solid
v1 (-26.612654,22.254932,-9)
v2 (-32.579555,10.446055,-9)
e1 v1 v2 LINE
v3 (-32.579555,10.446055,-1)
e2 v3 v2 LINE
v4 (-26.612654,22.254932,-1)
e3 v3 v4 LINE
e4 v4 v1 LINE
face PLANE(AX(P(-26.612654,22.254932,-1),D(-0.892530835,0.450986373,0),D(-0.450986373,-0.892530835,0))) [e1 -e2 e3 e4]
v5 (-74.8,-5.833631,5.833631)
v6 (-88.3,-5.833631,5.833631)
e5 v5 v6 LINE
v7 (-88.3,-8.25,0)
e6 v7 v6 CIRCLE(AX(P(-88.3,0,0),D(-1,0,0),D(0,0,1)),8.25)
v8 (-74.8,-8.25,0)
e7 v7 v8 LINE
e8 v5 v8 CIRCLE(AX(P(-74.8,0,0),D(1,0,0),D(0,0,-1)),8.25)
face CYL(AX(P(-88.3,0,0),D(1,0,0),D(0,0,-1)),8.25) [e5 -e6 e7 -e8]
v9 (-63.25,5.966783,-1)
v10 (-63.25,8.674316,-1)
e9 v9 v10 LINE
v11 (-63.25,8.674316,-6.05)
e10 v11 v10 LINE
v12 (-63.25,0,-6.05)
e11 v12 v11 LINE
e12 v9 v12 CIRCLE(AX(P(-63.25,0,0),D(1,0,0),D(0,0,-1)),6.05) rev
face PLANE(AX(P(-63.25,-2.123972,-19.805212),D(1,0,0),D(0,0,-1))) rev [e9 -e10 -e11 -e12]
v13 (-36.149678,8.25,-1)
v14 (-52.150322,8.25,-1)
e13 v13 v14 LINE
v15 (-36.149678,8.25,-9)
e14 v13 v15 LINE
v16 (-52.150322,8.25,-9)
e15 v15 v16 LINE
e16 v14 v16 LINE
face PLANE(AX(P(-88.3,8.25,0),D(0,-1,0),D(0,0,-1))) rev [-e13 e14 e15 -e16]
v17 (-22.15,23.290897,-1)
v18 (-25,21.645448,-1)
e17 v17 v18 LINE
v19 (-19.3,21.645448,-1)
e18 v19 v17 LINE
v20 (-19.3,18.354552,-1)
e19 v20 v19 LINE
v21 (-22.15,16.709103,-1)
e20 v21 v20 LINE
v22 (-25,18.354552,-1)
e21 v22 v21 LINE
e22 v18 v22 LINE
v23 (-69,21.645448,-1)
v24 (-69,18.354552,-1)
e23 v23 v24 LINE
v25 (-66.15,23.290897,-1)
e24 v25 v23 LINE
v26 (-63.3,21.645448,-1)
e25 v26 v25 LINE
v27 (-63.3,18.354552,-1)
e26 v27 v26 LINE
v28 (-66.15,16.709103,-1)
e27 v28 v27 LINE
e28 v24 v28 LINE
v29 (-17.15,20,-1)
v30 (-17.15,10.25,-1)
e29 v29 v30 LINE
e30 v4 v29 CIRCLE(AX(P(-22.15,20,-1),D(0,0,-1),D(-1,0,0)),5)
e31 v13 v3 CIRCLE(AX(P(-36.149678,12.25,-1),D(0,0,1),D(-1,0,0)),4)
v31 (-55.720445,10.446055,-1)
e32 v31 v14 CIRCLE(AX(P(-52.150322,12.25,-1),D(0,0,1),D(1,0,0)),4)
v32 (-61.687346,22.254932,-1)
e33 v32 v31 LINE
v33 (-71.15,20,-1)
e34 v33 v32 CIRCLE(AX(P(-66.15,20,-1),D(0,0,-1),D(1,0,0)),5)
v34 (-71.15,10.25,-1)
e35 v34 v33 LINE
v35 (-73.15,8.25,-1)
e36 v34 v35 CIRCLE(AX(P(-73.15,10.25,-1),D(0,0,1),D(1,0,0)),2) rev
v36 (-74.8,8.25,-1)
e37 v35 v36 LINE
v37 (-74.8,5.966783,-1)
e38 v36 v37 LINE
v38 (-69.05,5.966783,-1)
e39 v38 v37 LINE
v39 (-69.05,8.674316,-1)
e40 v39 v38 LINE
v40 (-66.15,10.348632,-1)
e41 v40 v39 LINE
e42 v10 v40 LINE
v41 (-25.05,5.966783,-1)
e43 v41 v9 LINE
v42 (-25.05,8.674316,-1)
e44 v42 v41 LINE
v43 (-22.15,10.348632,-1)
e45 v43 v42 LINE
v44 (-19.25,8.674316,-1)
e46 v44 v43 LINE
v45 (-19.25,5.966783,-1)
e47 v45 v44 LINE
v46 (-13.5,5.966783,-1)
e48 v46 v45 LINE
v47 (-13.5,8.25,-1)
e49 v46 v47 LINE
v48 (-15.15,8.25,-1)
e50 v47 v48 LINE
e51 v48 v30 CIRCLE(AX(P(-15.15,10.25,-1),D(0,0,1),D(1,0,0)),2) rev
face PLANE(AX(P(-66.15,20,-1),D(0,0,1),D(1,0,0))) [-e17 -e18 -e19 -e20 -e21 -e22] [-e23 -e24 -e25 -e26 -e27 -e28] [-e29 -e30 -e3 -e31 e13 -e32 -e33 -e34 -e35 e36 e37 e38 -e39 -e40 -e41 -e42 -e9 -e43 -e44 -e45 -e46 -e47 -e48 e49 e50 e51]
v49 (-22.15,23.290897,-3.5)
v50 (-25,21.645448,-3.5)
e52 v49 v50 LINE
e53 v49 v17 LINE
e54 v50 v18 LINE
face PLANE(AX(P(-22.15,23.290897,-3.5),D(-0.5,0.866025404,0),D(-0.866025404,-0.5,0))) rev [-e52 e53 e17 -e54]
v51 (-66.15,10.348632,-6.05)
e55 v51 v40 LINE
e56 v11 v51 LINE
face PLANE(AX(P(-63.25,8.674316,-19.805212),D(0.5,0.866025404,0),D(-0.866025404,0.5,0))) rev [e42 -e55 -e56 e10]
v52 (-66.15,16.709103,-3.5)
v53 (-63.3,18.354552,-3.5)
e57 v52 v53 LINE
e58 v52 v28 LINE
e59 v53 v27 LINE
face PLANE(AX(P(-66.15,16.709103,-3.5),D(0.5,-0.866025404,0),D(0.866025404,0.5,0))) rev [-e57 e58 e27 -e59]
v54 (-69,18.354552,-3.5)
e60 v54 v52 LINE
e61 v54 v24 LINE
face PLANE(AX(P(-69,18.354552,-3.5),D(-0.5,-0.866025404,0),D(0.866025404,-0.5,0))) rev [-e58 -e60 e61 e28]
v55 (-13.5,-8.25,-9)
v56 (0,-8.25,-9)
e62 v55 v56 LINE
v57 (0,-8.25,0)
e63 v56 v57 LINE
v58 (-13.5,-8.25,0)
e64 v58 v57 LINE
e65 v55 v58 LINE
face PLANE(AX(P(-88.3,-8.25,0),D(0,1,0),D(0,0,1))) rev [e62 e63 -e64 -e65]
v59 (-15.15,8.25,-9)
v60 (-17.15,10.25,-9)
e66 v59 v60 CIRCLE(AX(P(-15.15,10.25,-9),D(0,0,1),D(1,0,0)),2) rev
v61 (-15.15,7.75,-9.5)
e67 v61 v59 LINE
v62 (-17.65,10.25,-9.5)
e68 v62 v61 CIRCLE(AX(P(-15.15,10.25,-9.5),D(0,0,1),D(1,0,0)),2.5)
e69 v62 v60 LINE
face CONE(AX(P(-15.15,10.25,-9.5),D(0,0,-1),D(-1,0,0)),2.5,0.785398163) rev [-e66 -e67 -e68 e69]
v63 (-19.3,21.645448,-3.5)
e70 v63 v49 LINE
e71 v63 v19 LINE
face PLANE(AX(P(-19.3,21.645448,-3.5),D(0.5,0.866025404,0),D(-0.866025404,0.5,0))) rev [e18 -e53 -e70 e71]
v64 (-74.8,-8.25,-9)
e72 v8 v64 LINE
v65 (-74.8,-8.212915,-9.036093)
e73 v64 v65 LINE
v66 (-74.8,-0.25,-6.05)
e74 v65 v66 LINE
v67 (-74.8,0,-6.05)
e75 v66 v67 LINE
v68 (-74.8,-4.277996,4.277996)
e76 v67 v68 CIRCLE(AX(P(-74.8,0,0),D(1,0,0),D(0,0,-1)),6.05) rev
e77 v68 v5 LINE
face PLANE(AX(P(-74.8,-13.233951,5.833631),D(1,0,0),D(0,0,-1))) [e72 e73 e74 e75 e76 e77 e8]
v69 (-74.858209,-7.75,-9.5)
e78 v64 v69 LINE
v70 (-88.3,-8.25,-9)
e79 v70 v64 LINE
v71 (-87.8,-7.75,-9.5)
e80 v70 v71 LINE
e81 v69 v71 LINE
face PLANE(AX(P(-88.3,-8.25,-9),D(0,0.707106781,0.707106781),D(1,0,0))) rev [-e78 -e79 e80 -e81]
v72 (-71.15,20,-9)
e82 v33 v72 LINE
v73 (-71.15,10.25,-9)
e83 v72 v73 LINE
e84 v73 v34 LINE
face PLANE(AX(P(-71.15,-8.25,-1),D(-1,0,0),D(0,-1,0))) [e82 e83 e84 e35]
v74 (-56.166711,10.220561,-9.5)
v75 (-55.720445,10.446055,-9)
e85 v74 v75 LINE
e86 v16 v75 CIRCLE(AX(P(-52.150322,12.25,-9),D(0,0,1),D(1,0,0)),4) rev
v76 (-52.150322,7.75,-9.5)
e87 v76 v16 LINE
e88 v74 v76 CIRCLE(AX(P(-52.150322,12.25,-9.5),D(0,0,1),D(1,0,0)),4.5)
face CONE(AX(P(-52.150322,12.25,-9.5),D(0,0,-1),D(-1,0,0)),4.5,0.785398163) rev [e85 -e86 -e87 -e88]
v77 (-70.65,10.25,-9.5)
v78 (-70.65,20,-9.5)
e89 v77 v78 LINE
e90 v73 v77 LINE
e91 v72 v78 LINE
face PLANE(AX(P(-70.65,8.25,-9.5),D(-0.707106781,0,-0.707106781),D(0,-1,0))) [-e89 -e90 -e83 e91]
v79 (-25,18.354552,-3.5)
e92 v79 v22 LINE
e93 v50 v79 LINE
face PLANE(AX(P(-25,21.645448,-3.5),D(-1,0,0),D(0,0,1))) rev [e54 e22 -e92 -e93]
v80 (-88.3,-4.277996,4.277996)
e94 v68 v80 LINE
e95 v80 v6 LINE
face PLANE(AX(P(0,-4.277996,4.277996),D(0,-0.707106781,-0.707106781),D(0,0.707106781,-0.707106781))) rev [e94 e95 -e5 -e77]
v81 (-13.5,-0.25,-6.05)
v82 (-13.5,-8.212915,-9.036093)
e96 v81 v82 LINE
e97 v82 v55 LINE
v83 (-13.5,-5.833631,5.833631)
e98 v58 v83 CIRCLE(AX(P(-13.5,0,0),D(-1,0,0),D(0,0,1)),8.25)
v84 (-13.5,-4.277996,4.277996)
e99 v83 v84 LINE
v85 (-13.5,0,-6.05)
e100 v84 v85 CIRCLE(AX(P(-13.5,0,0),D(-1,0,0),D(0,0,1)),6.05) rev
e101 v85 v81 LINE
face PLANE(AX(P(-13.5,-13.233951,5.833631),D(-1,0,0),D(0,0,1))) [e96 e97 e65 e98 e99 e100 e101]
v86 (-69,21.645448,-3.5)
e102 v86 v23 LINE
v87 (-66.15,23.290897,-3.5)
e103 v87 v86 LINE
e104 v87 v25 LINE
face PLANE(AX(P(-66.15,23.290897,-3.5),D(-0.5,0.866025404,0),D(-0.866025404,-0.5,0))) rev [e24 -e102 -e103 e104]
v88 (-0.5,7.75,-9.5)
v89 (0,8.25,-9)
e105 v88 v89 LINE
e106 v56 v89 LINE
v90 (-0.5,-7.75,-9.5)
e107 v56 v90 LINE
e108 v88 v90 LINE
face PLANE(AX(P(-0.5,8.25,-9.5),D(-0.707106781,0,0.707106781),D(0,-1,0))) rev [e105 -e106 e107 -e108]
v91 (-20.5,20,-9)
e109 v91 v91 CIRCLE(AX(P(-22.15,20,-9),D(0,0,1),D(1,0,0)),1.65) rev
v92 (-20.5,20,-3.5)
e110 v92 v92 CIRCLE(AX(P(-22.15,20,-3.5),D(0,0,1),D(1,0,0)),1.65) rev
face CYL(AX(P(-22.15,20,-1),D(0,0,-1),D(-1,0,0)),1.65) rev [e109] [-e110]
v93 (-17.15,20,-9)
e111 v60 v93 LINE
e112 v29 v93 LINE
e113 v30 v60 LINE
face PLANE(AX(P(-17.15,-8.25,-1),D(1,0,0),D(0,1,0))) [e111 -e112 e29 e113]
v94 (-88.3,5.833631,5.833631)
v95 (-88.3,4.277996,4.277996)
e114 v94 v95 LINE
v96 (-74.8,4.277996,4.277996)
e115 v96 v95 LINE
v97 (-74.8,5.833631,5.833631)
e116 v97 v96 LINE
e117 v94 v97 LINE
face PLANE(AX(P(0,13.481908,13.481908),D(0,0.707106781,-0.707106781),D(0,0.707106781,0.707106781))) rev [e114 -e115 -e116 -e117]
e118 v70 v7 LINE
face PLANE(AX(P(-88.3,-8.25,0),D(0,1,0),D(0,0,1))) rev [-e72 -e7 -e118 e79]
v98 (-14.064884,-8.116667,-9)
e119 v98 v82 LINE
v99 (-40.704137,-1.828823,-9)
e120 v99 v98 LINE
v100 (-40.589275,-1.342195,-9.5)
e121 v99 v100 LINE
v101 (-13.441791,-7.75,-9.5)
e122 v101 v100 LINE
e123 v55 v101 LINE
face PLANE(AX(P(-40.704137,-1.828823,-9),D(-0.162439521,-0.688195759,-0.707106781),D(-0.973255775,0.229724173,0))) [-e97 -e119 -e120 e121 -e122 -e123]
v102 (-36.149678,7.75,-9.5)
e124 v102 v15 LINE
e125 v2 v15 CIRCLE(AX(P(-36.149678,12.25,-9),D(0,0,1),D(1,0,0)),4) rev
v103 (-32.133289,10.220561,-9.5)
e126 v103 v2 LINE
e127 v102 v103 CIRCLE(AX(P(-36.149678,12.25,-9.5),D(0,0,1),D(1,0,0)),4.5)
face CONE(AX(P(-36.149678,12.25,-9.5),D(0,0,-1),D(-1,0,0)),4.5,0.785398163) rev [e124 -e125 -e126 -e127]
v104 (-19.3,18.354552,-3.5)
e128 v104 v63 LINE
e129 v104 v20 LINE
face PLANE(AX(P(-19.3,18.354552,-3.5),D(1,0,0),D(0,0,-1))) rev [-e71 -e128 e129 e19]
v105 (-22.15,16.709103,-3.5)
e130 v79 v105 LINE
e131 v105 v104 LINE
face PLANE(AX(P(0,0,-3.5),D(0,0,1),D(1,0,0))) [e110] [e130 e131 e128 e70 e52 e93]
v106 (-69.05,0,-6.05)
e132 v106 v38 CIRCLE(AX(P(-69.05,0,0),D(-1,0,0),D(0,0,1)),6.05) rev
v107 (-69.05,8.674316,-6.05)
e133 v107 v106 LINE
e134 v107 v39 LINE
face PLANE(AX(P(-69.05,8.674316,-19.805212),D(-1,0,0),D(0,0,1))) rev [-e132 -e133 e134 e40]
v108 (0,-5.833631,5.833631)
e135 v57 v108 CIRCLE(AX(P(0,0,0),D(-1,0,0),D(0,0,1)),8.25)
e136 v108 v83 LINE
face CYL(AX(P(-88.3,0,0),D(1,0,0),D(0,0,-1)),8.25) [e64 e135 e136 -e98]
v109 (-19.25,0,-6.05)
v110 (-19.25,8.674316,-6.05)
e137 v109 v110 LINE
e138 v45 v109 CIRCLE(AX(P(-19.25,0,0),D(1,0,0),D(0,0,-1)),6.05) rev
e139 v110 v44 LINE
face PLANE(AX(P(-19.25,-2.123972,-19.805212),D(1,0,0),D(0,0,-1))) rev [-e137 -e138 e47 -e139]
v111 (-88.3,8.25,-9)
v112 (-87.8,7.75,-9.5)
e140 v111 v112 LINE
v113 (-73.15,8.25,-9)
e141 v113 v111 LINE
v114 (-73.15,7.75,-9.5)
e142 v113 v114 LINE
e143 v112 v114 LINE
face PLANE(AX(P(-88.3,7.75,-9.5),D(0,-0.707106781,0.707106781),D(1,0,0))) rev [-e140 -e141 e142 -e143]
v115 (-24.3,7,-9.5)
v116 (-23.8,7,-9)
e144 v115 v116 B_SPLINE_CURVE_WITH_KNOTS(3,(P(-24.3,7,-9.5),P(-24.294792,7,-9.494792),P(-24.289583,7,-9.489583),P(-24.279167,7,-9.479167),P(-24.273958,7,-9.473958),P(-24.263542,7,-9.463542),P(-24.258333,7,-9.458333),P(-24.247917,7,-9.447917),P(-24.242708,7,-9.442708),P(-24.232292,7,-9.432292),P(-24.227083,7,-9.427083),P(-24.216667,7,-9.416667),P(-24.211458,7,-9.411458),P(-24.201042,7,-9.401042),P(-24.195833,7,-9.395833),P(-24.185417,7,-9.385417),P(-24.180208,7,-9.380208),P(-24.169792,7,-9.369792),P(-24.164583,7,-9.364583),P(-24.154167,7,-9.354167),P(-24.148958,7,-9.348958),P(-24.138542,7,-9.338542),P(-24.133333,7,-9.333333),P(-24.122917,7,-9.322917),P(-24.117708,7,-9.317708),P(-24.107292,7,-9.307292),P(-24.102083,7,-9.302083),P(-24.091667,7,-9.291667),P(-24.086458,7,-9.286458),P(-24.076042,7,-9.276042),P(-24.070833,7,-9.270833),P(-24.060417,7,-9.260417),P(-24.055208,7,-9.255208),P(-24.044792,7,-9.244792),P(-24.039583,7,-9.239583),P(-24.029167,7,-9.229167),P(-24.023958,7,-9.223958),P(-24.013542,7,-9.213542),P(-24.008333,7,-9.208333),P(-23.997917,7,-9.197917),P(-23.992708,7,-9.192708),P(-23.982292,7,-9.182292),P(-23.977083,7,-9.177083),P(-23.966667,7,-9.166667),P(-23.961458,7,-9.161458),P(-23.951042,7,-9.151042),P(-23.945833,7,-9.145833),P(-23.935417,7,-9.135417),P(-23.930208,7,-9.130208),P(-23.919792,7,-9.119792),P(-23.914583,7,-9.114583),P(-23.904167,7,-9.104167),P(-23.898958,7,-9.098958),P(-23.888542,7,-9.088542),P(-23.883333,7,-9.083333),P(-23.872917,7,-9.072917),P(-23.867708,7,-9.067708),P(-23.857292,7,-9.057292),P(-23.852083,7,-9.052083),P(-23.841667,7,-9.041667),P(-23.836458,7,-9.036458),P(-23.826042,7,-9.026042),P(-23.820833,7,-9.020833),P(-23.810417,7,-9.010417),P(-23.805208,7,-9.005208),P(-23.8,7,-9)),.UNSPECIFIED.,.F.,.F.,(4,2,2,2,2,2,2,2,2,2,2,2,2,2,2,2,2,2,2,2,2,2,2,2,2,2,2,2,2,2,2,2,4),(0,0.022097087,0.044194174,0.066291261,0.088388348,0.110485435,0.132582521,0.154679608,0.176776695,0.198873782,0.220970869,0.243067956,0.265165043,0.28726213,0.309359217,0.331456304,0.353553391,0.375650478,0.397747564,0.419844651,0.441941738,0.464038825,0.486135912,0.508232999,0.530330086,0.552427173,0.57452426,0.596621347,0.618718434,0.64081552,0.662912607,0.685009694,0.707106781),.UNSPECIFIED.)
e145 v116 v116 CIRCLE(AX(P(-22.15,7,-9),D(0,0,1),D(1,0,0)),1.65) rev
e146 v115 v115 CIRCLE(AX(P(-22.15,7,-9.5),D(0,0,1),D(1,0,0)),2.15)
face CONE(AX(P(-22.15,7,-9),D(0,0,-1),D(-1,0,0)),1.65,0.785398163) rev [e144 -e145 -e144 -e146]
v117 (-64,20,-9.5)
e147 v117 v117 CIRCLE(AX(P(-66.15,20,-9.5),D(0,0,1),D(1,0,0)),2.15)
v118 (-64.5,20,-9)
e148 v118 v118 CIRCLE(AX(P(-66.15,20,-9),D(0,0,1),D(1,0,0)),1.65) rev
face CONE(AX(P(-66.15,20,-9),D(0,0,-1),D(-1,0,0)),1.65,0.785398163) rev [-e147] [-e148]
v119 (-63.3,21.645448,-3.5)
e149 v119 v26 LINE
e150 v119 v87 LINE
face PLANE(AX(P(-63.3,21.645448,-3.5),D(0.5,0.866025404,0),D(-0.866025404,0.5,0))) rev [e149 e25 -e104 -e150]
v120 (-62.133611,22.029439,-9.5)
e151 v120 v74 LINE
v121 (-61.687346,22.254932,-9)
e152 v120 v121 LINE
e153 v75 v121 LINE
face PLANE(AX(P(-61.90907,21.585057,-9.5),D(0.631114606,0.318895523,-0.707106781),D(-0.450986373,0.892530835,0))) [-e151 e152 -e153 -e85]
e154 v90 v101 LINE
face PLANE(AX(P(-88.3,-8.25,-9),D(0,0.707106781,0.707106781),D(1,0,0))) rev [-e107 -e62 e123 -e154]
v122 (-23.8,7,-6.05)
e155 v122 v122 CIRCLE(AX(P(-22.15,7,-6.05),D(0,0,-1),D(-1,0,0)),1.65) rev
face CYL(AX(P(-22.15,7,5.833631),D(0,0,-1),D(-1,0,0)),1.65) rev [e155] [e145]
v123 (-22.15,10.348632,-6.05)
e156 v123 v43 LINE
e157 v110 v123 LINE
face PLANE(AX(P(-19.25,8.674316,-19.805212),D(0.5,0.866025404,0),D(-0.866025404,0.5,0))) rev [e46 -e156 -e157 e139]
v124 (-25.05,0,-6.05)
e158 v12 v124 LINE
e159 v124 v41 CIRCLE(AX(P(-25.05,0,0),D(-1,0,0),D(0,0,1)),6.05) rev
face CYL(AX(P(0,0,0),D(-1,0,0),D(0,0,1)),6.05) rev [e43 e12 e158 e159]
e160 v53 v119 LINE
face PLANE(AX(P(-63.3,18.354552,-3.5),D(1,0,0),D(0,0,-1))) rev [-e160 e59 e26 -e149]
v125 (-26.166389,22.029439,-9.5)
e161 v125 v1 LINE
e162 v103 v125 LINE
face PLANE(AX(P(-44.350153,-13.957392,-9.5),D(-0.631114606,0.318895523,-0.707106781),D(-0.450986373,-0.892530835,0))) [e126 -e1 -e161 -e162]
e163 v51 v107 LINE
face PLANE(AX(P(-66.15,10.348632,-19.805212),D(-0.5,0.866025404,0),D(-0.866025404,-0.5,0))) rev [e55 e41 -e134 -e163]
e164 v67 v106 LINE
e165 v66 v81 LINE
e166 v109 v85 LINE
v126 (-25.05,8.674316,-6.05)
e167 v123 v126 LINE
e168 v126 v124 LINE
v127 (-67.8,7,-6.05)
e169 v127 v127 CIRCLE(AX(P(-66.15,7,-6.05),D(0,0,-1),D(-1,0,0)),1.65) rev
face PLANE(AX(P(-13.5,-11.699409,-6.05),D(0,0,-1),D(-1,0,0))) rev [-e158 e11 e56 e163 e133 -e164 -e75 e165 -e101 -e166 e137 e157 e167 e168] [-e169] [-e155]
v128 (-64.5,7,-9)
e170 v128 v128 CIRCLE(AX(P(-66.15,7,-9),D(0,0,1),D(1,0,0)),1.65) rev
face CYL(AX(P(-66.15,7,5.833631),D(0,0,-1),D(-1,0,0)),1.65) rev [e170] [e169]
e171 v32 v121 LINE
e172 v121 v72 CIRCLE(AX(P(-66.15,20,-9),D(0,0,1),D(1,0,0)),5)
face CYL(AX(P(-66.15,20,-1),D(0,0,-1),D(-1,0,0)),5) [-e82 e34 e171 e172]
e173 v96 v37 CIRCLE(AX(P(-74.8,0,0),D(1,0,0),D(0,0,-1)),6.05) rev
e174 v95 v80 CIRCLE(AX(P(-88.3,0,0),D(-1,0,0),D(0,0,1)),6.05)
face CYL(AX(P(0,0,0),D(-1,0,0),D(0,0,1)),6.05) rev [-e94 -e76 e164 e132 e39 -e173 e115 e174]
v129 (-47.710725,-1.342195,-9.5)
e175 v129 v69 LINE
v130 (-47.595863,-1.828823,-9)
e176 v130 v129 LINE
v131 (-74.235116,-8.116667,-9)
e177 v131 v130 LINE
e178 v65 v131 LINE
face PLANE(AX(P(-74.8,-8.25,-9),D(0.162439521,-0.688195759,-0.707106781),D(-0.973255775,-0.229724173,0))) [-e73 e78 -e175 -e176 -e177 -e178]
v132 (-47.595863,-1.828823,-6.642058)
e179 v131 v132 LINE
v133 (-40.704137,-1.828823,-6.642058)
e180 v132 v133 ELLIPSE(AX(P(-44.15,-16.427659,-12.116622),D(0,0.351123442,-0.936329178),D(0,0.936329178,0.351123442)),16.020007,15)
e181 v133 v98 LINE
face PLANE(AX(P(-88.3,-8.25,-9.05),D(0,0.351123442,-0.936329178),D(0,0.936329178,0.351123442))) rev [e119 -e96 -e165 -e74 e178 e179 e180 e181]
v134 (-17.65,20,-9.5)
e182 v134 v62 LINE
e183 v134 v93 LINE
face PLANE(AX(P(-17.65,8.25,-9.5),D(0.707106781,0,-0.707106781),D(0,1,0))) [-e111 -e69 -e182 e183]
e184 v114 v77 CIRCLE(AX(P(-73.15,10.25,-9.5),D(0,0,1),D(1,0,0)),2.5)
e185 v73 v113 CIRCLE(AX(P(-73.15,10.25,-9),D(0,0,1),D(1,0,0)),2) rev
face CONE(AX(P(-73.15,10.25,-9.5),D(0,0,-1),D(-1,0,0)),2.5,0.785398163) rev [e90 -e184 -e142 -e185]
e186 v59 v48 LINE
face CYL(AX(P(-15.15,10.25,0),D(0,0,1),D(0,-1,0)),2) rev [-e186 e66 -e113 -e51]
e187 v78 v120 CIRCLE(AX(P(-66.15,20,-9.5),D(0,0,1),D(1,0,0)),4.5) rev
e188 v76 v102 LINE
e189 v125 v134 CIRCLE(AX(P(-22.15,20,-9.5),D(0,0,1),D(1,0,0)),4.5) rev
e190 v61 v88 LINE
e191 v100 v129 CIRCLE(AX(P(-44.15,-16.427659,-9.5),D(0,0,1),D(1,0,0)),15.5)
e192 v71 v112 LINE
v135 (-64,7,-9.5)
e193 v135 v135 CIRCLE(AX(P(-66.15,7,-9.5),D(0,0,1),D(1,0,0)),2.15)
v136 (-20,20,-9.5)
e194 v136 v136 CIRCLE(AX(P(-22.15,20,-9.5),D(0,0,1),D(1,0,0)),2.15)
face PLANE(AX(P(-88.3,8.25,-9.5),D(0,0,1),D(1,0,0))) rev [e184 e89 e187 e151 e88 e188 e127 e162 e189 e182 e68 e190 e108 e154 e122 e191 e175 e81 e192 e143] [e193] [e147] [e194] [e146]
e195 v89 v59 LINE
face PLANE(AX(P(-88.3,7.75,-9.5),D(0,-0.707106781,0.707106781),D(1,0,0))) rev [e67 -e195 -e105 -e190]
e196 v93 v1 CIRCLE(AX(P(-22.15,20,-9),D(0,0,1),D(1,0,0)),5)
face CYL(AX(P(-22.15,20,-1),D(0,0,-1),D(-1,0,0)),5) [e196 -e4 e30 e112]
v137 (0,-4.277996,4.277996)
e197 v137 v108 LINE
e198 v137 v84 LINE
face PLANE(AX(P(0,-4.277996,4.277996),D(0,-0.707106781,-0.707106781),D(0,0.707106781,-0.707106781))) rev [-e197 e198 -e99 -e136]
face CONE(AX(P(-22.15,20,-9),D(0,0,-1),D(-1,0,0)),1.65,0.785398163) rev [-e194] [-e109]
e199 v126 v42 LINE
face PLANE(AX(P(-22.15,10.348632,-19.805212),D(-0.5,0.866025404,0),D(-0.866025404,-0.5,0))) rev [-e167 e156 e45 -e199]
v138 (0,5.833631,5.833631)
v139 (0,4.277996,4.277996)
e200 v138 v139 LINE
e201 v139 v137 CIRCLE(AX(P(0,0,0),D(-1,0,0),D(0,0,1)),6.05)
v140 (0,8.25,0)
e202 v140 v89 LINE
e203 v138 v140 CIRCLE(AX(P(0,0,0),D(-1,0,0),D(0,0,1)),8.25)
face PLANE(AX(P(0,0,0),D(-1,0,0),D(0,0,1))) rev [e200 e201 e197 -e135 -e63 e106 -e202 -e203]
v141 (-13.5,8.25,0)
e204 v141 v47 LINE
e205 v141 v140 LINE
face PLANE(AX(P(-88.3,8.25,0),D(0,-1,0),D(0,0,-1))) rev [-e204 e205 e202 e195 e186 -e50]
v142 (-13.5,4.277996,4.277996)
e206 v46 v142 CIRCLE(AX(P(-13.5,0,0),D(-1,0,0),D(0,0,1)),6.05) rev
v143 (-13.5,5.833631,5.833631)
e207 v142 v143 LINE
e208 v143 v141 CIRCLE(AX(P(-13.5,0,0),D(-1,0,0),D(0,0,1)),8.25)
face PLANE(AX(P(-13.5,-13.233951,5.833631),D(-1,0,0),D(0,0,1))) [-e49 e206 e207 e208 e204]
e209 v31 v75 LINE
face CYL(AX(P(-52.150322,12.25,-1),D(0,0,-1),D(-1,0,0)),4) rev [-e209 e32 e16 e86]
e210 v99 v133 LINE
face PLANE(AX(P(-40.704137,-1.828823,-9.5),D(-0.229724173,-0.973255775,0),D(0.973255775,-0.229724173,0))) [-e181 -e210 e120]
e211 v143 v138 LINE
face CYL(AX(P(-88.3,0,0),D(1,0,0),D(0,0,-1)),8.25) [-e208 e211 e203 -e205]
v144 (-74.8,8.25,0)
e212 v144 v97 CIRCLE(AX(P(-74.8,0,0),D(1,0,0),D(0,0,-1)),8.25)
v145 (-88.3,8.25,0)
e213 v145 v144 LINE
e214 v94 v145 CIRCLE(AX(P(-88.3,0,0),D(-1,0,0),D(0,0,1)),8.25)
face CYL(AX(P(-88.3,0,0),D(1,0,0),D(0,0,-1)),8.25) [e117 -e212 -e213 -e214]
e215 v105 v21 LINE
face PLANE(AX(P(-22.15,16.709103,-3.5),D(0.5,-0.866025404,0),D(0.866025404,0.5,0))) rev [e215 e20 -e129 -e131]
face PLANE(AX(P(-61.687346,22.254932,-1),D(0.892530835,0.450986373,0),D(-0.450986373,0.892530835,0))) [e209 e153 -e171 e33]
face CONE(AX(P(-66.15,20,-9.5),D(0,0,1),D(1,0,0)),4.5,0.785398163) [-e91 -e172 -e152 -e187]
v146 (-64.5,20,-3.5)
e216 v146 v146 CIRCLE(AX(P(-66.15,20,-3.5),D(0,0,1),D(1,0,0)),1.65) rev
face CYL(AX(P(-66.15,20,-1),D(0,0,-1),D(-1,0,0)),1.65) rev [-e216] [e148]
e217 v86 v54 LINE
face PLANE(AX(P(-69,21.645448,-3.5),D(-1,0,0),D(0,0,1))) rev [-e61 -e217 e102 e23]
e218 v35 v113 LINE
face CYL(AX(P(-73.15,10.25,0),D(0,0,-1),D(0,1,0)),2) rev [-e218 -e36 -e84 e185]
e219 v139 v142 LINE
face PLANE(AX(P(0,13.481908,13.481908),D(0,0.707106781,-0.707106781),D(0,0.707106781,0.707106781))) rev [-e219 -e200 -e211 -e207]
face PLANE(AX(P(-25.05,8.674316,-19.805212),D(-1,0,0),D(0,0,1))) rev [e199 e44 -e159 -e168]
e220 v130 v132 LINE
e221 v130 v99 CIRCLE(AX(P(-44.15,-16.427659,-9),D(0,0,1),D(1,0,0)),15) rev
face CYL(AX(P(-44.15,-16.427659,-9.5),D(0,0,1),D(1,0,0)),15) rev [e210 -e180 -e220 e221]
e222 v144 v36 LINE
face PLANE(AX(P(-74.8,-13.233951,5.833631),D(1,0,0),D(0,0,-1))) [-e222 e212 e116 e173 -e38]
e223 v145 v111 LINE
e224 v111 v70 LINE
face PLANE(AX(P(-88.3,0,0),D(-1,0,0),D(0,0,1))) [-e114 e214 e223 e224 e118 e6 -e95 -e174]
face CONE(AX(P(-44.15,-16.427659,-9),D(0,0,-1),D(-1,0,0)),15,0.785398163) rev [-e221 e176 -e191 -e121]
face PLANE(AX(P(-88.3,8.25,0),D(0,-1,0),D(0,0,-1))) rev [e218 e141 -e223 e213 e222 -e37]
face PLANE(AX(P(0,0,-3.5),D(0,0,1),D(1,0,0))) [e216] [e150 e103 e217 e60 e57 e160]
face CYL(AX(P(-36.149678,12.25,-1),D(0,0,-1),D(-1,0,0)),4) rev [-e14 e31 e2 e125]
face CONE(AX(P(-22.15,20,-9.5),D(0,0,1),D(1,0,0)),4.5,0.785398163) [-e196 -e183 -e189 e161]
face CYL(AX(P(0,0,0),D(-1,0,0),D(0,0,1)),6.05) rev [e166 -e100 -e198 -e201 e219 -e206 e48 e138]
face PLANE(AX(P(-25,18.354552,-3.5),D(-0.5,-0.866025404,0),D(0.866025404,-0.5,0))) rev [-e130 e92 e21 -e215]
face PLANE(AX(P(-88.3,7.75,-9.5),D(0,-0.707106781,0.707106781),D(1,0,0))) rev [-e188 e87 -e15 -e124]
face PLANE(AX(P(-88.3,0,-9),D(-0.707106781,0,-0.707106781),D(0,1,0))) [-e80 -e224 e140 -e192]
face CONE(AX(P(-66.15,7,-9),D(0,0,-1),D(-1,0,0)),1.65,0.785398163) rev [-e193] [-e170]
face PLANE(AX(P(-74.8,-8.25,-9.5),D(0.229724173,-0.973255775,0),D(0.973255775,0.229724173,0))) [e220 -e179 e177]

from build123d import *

# Parameters (mm, degrees)
BOSS_EXTRUDE1_DEPTH = 88.3
SKETCH6_R           = 1.65
BOSS_EXTRUDE2_DEPTH = 8.5
CUT_EXTRUDE1_DEPTH  = 93.261259475
SKETCH8_W           = 61.3
SKETCH8_H           = 21.483950942
CUT_EXTRUDE2_DEPTH  = 93.163658782
SKETCH9_W           = 61.3
SKETCH9_H           = 11.699409457
CUT_EXTRUDE3_DEPTH  = 93.53707735
SKETCH10_R          = 1.65
CUT_EXTRUDE4_DEPTH  = 94.043055829
CHAMFER1_SIZE       = 8
CHAMFER1_SIZE2      = 3
CUT_EXTRUDE5_DEPTH  = 93.537077445
FILLET1_R           = 2
CUT_EXTRUDE7_START  = -5.05
CUT_EXTRUDE7_DEPTH  = 5.05
CUT_EXTRUDE8_DEPTH  = 2.5
CHAMFER2_SIZE       = 0.5


with BuildPart() as part:
    # Sketch1 → Boss-Extrude1 (new body)
    with BuildSketch(Plane.ZY):
        with BuildLine():
            Line((-9.5, 8.25), (-9.5, -8.25))
            Line((-9.5, -8.25), (0, -8.25))
            ThreePointArc((0, -8.25), (8.25, 0), (0, 8.25))
            Line((0, 8.25), (-9.5, 8.25))
        make_face()
    extrude(amount=BOSS_EXTRUDE1_DEPTH)

    # Sketch6 → Boss-Extrude2 (add)
    with BuildSketch(Plane(origin=(0, 0, -9.5), x_dir=(-1, 0, 0), z_dir=(0, 0, -1))):
        with BuildLine():
            Line((17.15, -8.25), (17.15, 20))
            ThreePointArc((17.15, 20), (20.99096395, 24.863808737), (26.612654174, 22.254931867))
            Line((26.612654174, 22.254931867), (32.579554775, 10.446054507))
            ThreePointArc((32.579554775, 10.446054507), (34.053942202, 8.842964487), (36.149678114, 8.25))
            Line((36.149678114, 8.25), (52.150321886, 8.25))
            ThreePointArc((52.150321886, 8.25), (54.246057798, 8.842964487), (55.720445225, 10.446054507))
            Line((55.720445225, 10.446054507), (61.687345826, 22.254931867))
            ThreePointArc((61.687345826, 22.254931867), (67.30903605, 24.863808737), (71.15, 20))
            Line((71.15, 20), (71.15, -8.25))
            Line((71.15, -8.25), (17.15, -8.25))
        make_face()
        with Locations((22.15, 20)):
            Circle(SKETCH6_R, mode=Mode.SUBTRACT)
        with Locations(Location((66.15, 20, 0), (0, 0, 180))):
            Circle(SKETCH6_R, mode=Mode.SUBTRACT)
    extrude(amount=-BOSS_EXTRUDE2_DEPTH)

    # Sketch7 → Cut-Extrude1 (cut, through all)
    with BuildSketch(Plane.ZY.offset(88.3)):
        with BuildLine():
            Line((13.481907846, 13.481907846), (4.277996026, 4.277996026))
            ThreePointArc((4.277996026, 4.277996026), (-6.05, 0), (4.277996026, -4.277996026))
            Line((4.277996026, -4.277996026), (13.481907846, -13.481907846))
            Line((13.481907846, -13.481907846), (13.481907846, 13.481907846))
        make_face()
    extrude(amount=-CUT_EXTRUDE1_DEPTH, mode=Mode.SUBTRACT)

    # Sketch8 → Cut-Extrude2 (cut, through all)
    with BuildSketch(Plane.XY.offset(-1)):
        with Locations((-44.15, -2.491975471)):
            Rectangle(SKETCH8_W, SKETCH8_H)
    extrude(amount=CUT_EXTRUDE2_DEPTH, mode=Mode.SUBTRACT)

    # Sketch9 → Cut-Extrude3 (cut, through all)
    with BuildSketch(Plane(origin=(0, 0, -6.05), x_dir=(-1, 0, 0), z_dir=(0, 0, -1))):
        with Locations((44.15, -5.849704729)):
            Rectangle(SKETCH9_W, SKETCH9_H)
    extrude(amount=-CUT_EXTRUDE3_DEPTH, mode=Mode.SUBTRACT)

    # Sketch10 → Cut-Extrude4 (cut, through all)
    with BuildSketch(Plane(origin=(0, 0, -9.5), x_dir=(-1, 0, 0), z_dir=(0, 0, -1))):
        with Locations((22.15, 7)):
            Circle(SKETCH10_R)
        with Locations((66.15, 7)):
            Circle(SKETCH10_R)
    extrude(amount=-CUT_EXTRUDE4_DEPTH, mode=Mode.SUBTRACT)

    # Chamfer1
    chamfer1_edges = [part.edges().sort_by_distance(p)[0] for p in [
        (-44.15, -8.25, -6.05),
    ]]
    chamfer1_side = [part.faces().sort_by_distance(p)[0] for p in [
        (-44.15, -4.125, -6.05),
    ]]
    chamfer(chamfer1_edges, length=CHAMFER1_SIZE, length2=CHAMFER1_SIZE2, reference=chamfer1_side[0])

    # Sketch11 → Cut-Extrude5 (cut, through all)
    with BuildSketch(Plane(origin=(0, 0, -6.05), x_dir=(-1, 0, 0), z_dir=(0, 0, -1))):
        with BuildLine():
            Line((74.8, -8.25), (47.5958626, -1.828822614))
            ThreePointArc((47.5958626, -1.828822614), (44.15, -1.427659244), (40.7041374, -1.828822614))
            Line((40.7041374, -1.828822614), (13.5, -8.25))
            Line((13.5, -8.25), (13.5, -16.427659244))
            Line((13.5, -16.427659244), (74.8, -16.427659244))
            Line((74.8, -16.427659244), (74.8, -8.25))
        make_face()
    extrude(amount=CUT_EXTRUDE5_DEPTH, mode=Mode.SUBTRACT)

    # Fillet1
    fillet1_edges = [part.edges().sort_by_distance(p)[0] for p in [
        (-17.15, 8.25, -5.25),
        (-71.15, 8.25, -5.25),
    ]]
    fillet(fillet1_edges, radius=FILLET1_R)

    # Sketch13 → Cut-Extrude7 (cut)
    with BuildSketch(Plane.XY.offset(-1).offset(CUT_EXTRUDE7_START)):
        Polygon((-69.05, -2.12397244), (-63.25, -2.12397244), (-63.25, 8.674315781), (-66.15, 10.348631561), (-69.05, 8.674315781), align=None)
        Polygon((-25.05, -2.12397244), (-19.25, -2.12397244), (-19.25, 8.674315781), (-22.15, 10.348631561), (-25.05, 8.674315781), align=None)
    extrude(amount=CUT_EXTRUDE7_DEPTH, mode=Mode.SUBTRACT)

    # Sketch14 → Cut-Extrude8 (cut)
    with BuildSketch(Plane.XY.offset(-1)):
        Polygon((-69, 21.645448267), (-69, 18.354551733), (-66.15, 16.709103466), (-63.3, 18.354551733), (-63.3, 21.645448267), (-66.15, 23.290896534), align=None)
        Polygon((-22.15, 23.290896534), (-25, 21.645448267), (-25, 18.354551733), (-22.15, 16.709103466), (-19.3, 18.354551733), (-19.3, 21.645448267), align=None)
    extrude(amount=-CUT_EXTRUDE8_DEPTH, mode=Mode.SUBTRACT)

    # Chamfer2
    # the kernel refuses this chamfer: 0.5 mm, written as the material it takes off along each edge
    with BuildSketch(Plane(origin=(-88.3, 9.535841494, -9.5), x_dir=(0.9996219169112968, 0, -0.02749587661058574), z_dir=(0, -1, 0))) as chamfer2_piece_1:
        Polygon((CHAMFER2_SIZE * 0.999621916911, CHAMFER2_SIZE * 0.0274958766106), (-CHAMFER2_SIZE * 0.0274958766106, CHAMFER2_SIZE * 0.999621916911), (0, 0), align=None)
    extrude(amount=19.071682988, mode=Mode.SUBTRACT)
    with BuildSketch(Plane(origin=(-22.15, 7, -9.5), x_dir=(-1, 0, 0), z_dir=(0, -1, 0))) as chamfer2_piece_2:
        Polygon((1.65 + CHAMFER2_SIZE, 0), (1.65, -CHAMFER2_SIZE), (1.65, 0), align=None)
    revolve(axis=Axis((-22.15, 7, -9.5), (0, 0, -1)), mode=Mode.SUBTRACT)
    with BuildSketch(Plane(origin=(-66.15, 7, -9.5), x_dir=(-1, 0, 0), z_dir=(0, -1, 0))) as chamfer2_piece_3:
        Polygon((1.65 + CHAMFER2_SIZE, 0), (1.65, -CHAMFER2_SIZE), (1.65, 0), align=None)
    revolve(axis=Axis((-66.15, 7, -9.5), (0, 0, -1)), mode=Mode.SUBTRACT)
    with BuildSketch(Plane(origin=(-36.149678114, 8.25, -9.5), x_dir=(0, -0.9996219169112968, -0.027495876610585647), z_dir=(-1, 0, 0))) as chamfer2_piece_4:
        Polygon((CHAMFER2_SIZE * 0.999621916911, CHAMFER2_SIZE * 0.0274958766106), (-CHAMFER2_SIZE * 0.0274958766106, CHAMFER2_SIZE * 0.999621916911), (0, 0), align=None)
    extrude(amount=16.000643772, mode=Mode.SUBTRACT)
    with BuildSketch(Plane(origin=(1.285841494, -8.25, -9.5), x_dir=(0, 0.9996219169112968, -0.027495876610585647), z_dir=(-1, 0, 0)), Plane(origin=(-73.514158506, -8.25, -9.5), x_dir=(0, 0.9996219169112968, -0.027495876610585647), z_dir=(-1, 0, 0))) as chamfer2_piece_5:
        Polygon((CHAMFER2_SIZE * 0.999621916911, -CHAMFER2_SIZE * 0.0274958766106), (-CHAMFER2_SIZE * 0.0274958766106, -CHAMFER2_SIZE * 0.999621916911), (0, 0), align=None)
    extrude(amount=16.071682988, mode=Mode.SUBTRACT)
    with BuildSketch(Plane(origin=(-76.05145266, -8.545388874, -9.5), x_dir=(-0.22963731849575525, 0.9728878037695274, -0.027495876610585463), z_dir=(0.9732557753191584, 0.22972417332075415, 0)), Plane(origin=(-40.7041374, -1.828822614, -9.5), x_dir=(0.22963731849575528, 0.9728878037695274, -0.027495876610585706), z_dir=(0.9732557753191584, -0.2297241733207542, 0))) as chamfer2_piece_6:
        Polygon((CHAMFER2_SIZE * 0.999621916911, CHAMFER2_SIZE * 0.0274958766106), (-CHAMFER2_SIZE * 0.0274958766106, CHAMFER2_SIZE * 0.999621916911), (0, 0), align=None)
    extrude(amount=29.237524998, mode=Mode.SUBTRACT)
    with BuildSketch(Plane(origin=(-44.15, -16.427659244, -9.5), x_dir=(0.22972417332075398, 0.9732557753191584, 0), z_dir=(0.9732557753191584, -0.22972417332075398, 0))) as chamfer2_piece_7:
        Polygon((15 + CHAMFER2_SIZE, 0), (15, CHAMFER2_SIZE), (15, 0), align=None)
    revolve(axis=Axis((-44.15, -16.427659244, -9.5), (0, 0, 1)), revolution_arc=26.561666454, mode=Mode.SUBTRACT)
    with BuildSketch(Plane(origin=(-71.15, 20, -9.5), x_dir=(0.9996219169112968, 0, -0.02749587661058574), z_dir=(0, -1, 0)), Plane(origin=(-17.15, 10.25, -9.5), x_dir=(-0.9996219169112968, 0, -0.02749587661058555), z_dir=(0, 1, 0))) as chamfer2_piece_8:
        Polygon((CHAMFER2_SIZE * 0.999621916911, CHAMFER2_SIZE * 0.0274958766106), (-CHAMFER2_SIZE * 0.0274958766106, CHAMFER2_SIZE * 0.999621916911), (0, 0), align=None)
    extrude(amount=9.75, mode=Mode.SUBTRACT)
    with BuildSketch(Plane(origin=(1.285841494, 8.25, -9.5), x_dir=(0, -0.9996219169112968, -0.027495876610585647), z_dir=(-1, 0, 0))) as chamfer2_piece_9:
        Polygon((CHAMFER2_SIZE * 0.999621916911, CHAMFER2_SIZE * 0.0274958766106), (-CHAMFER2_SIZE * 0.0274958766106, CHAMFER2_SIZE * 0.999621916911), (0, 0), align=None)
    extrude(amount=16.435841494, mode=Mode.SUBTRACT)
    with BuildSketch(Plane(origin=(-73.15, 10.25, -9.5), x_dir=(0, -1, 0), z_dir=(-1, 0, 0))) as chamfer2_piece_10:
        Polygon((2, CHAMFER2_SIZE), (2 + CHAMFER2_SIZE, 0), (2, 0), align=None)
    revolve(axis=Axis((-73.15, 10.25, -9.5), (0, 0, 1)), revolution_arc=90, mode=Mode.SUBTRACT)
    with BuildSketch(Plane(origin=(-15.15, 10.25, -9.5), x_dir=(-1, 0, 0), z_dir=(0, 1, 0))) as chamfer2_piece_11:
        Polygon((2 + CHAMFER2_SIZE, 0), (2, CHAMFER2_SIZE), (2, 0), align=None)
    revolve(axis=Axis((-15.15, 10.25, -9.5), (0, 0, 1)), revolution_arc=90, mode=Mode.SUBTRACT)
    with BuildSketch(Plane(origin=(-36.149678114, 12.25, -9.5), x_dir=(0.8925308347817242, -0.45098637336824104, 0), z_dir=(0.45098637336824104, 0.8925308347817242, 0))) as chamfer2_piece_12:
        Polygon((4 + CHAMFER2_SIZE, 0), (4, -CHAMFER2_SIZE), (4, 0), align=None)
    revolve(axis=Axis((-36.149678114, 12.25, -9.5), (0, 0, -1)), revolution_arc=63.19301373, mode=Mode.SUBTRACT)
    with BuildSketch(Plane(origin=(-26.612654174, 22.254931867, -9.5), x_dir=(0.8921933839669467, -0.4508158630472358, -0.027495876610585532), z_dir=(-0.45098637336824193, -0.8925308347817238, 0)), Plane(origin=(-55.720445225, 10.446054507, -9.5), x_dir=(-0.8921933839669467, -0.4508158630472356, -0.027495876610585574), z_dir=(-0.45098637336824177, 0.8925308347817239, 0))) as chamfer2_piece_13:
        Polygon((CHAMFER2_SIZE * 0.999621916911, CHAMFER2_SIZE * 0.0274958766106), (-CHAMFER2_SIZE * 0.0274958766106, CHAMFER2_SIZE * 0.999621916911), (0, 0), align=None)
    extrude(amount=13.23077803, mode=Mode.SUBTRACT)
    with BuildSketch(Plane(origin=(-22.15, 20, -9.5), x_dir=(1, 0, 0), z_dir=(0, -1, 0))) as chamfer2_piece_14:
        Polygon((5 - CHAMFER2_SIZE, 0), (5, CHAMFER2_SIZE), (5, 0), align=None)
    revolve(axis=Axis((-22.15, 20, -9.5), (0, 0, 1)), revolution_arc=153.19301373, mode=Mode.SUBTRACT)
    with BuildSketch(Plane(origin=(-52.150321886, 12.25, -9.5), x_dir=(0, -1, 0), z_dir=(1, 0, 0))) as chamfer2_piece_15:
        Polygon((4 + CHAMFER2_SIZE, 0), (4, -CHAMFER2_SIZE), (4, 0), align=None)
    revolve(axis=Axis((-52.150321886, 12.25, -9.5), (0, 0, -1)), revolution_arc=63.19301373, mode=Mode.SUBTRACT)
    with BuildSketch(Plane(origin=(-66.15, 20, -9.5), x_dir=(0.892530834781725, 0.45098637336823943, 0), z_dir=(0.45098637336823943, -0.892530834781725, 0))) as chamfer2_piece_16:
        Polygon((5 - CHAMFER2_SIZE, 0), (5, CHAMFER2_SIZE), (5, 0), align=None)
    revolve(axis=Axis((-66.15, 20, -9.5), (0, 0, 1)), revolution_arc=153.19301373, mode=Mode.SUBTRACT)
    with BuildSketch(Plane(origin=(-22.15, 20, -9.5), x_dir=(-1, 0, 0), z_dir=(0, -1, 0))) as chamfer2_piece_17:
        Polygon((1.65 + CHAMFER2_SIZE, 0), (1.65, -CHAMFER2_SIZE), (1.65, 0), align=None)
    revolve(axis=Axis((-22.15, 20, -9.5), (0, 0, -1)), mode=Mode.SUBTRACT)
    with BuildSketch(Plane(origin=(-66.15, 20, -9.5), x_dir=(1, 0, 0), z_dir=(0, 1, 0))) as chamfer2_piece_18:
        Polygon((1.65 + CHAMFER2_SIZE, 0), (1.65, -CHAMFER2_SIZE), (1.65, 0), align=None)
    revolve(axis=Axis((-66.15, 20, -9.5), (0, 0, -1)), mode=Mode.SUBTRACT)
    with BuildSketch(Plane(origin=(0, 9.535841494, -9.5), x_dir=(-0.9996219169112968, 0, -0.02749587661058563), z_dir=(0, -1, 0))) as chamfer2_piece_19:
        Polygon((CHAMFER2_SIZE * 0.999621916911, -CHAMFER2_SIZE * 0.0274958766106), (-CHAMFER2_SIZE * 0.0274958766106, -CHAMFER2_SIZE * 0.999621916911), (0, 0), align=None)
    extrude(amount=19.071682988, mode=Mode.SUBTRACT)
    with BuildSketch(Plane(origin=(-73.15, 8.25, -9.5), x_dir=(0, 0.027495876610585647, 0.9996219169112968), z_dir=(-1, 0, 0))) as chamfer2_piece_20:
        Polygon((CHAMFER2_SIZE * 0.999621916911, -CHAMFER2_SIZE * 0.0274958766106), (-CHAMFER2_SIZE * 0.0274958766106, -CHAMFER2_SIZE * 0.999621916911), (0, 0), align=None)
    extrude(amount=16.435841494, mode=Mode.SUBTRACT)


solid = part.part
